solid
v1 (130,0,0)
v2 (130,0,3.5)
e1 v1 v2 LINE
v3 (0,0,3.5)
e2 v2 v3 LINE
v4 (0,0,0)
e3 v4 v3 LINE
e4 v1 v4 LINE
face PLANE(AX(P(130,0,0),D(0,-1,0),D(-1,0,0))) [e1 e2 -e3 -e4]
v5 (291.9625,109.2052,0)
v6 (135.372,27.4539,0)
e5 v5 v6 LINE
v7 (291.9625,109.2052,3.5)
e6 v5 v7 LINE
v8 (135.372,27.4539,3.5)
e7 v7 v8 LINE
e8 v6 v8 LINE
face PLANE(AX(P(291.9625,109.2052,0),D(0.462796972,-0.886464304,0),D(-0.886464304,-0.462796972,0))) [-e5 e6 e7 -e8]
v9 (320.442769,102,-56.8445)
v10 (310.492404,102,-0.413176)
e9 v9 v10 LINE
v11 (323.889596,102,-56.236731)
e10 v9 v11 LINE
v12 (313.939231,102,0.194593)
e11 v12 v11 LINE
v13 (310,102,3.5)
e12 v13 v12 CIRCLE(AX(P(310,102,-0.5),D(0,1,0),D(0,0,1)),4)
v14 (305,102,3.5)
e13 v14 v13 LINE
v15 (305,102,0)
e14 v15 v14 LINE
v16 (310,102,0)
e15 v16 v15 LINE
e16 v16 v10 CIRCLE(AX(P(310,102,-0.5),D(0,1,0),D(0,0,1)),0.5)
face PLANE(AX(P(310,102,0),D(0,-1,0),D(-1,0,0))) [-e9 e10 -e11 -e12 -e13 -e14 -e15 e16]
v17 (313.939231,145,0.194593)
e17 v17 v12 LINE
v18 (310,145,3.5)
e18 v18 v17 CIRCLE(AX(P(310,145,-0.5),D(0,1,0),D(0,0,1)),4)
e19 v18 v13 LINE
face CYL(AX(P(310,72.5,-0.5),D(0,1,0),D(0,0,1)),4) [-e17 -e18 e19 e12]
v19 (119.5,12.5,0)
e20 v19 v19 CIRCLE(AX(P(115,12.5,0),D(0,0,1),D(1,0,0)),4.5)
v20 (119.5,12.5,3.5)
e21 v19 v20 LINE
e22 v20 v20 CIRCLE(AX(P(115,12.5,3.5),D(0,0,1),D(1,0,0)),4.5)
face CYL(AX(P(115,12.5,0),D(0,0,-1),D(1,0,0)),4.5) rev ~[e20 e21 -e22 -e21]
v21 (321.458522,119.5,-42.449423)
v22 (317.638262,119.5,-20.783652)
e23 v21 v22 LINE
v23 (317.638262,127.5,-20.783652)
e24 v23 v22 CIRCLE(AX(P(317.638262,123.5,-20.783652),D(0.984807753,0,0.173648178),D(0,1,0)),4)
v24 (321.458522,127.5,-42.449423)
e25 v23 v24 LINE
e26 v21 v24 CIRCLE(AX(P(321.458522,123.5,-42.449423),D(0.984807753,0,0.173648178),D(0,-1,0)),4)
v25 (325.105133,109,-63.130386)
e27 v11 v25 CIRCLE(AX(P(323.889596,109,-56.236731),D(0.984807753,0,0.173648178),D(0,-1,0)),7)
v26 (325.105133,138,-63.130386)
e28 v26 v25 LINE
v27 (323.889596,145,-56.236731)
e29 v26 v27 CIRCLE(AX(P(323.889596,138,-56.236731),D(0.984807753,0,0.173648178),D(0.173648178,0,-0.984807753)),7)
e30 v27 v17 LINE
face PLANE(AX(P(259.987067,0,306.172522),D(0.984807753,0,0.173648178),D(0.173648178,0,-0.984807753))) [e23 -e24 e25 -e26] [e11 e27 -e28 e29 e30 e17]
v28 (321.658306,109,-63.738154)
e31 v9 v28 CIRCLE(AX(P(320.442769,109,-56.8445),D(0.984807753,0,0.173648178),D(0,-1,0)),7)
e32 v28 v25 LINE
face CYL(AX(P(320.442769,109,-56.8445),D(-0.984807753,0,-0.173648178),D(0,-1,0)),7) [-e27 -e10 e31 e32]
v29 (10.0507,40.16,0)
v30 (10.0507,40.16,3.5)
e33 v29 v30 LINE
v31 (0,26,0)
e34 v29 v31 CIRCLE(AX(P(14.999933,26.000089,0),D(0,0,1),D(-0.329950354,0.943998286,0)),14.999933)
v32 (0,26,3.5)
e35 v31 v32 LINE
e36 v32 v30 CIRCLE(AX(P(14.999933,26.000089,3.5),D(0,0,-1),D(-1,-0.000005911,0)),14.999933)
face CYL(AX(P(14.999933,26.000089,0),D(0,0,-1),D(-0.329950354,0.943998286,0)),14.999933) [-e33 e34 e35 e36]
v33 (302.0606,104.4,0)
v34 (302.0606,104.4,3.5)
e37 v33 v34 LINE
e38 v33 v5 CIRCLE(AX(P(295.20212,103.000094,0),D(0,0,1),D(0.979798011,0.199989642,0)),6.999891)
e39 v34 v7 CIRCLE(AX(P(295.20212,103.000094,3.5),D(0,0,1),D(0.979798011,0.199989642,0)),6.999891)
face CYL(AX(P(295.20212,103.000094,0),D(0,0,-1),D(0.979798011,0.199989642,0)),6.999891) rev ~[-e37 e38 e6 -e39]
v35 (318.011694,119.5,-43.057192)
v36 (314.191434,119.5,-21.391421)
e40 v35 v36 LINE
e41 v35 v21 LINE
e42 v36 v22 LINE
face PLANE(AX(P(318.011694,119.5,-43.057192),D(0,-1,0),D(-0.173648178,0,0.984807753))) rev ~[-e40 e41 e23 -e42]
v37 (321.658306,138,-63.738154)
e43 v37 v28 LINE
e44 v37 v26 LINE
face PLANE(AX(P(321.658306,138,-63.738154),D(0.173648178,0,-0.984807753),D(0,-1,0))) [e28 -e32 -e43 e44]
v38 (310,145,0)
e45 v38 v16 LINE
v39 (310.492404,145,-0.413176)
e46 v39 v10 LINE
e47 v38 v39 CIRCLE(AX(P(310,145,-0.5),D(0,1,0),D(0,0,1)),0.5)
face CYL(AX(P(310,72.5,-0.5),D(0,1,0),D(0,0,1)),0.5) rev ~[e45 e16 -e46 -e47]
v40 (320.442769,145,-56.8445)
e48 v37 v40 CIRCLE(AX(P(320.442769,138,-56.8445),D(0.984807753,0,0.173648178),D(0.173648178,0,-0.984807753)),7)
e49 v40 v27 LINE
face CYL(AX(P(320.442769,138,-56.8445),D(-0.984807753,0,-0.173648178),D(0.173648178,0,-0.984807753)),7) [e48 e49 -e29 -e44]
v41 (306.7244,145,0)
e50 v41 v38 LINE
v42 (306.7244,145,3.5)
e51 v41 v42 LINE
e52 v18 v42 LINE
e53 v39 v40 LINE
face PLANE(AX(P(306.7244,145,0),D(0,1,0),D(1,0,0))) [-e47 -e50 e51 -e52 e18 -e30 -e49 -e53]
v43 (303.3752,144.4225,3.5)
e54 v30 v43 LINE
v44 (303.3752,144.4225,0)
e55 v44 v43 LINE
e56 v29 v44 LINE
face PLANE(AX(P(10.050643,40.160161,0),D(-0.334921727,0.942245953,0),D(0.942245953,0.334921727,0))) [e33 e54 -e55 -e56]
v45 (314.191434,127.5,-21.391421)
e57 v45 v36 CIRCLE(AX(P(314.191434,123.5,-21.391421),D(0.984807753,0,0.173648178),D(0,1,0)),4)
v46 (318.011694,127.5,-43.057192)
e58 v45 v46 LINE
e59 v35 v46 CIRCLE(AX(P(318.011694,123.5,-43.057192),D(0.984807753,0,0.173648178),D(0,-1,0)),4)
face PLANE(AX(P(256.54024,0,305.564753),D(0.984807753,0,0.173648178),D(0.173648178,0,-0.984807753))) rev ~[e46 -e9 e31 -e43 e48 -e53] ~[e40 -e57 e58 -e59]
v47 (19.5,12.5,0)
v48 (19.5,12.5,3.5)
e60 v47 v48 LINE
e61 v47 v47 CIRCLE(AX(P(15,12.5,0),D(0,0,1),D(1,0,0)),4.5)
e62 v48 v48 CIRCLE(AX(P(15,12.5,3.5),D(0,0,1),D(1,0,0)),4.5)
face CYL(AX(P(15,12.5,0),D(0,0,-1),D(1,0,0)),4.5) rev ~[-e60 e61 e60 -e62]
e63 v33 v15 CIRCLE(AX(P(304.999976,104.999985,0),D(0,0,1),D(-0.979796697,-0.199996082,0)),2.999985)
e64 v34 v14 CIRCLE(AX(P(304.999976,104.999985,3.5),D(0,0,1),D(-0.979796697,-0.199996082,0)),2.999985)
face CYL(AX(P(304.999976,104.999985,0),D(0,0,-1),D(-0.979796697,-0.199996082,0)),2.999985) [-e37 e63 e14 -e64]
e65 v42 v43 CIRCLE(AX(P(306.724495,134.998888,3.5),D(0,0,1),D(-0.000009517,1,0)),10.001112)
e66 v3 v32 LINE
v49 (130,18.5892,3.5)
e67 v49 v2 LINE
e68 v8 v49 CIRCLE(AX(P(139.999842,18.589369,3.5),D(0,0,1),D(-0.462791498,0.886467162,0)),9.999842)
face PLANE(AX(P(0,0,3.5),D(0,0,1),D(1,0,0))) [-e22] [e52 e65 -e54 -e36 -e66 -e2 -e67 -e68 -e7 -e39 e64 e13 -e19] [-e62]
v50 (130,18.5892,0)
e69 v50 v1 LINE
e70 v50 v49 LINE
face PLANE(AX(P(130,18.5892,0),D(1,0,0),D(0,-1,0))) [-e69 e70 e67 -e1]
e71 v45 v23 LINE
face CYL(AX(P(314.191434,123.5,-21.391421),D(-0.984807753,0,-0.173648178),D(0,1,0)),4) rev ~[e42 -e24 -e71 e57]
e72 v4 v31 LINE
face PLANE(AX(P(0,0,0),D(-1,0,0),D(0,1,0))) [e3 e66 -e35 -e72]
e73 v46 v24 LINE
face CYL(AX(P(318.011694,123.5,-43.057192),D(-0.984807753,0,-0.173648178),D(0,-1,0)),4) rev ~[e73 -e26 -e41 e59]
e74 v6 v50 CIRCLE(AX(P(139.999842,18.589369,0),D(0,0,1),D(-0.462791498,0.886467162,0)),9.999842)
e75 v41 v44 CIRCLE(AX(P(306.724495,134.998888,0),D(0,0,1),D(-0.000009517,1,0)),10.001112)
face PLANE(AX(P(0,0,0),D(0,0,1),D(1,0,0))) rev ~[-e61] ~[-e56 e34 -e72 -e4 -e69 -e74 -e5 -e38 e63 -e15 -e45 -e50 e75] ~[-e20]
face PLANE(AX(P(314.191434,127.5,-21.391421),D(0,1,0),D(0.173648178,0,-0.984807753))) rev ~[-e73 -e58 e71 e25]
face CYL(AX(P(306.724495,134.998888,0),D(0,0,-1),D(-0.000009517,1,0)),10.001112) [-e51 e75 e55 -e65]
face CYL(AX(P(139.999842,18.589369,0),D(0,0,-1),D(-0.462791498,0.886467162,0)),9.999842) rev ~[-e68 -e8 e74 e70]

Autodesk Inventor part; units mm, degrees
ref_plane "YZ Plane" through (0, 0, 0) normal (1, 0, 0) x (0, 1, 0)
ref_plane "XZ Plane" through (0, 0, 0) normal (0, 1, 0) x (-1, 0, 0)
ref_plane "XY Plane" through (0, 0, 0) normal (0, 0, 1) x (1, 0, 0)
sketch "草圖1" plane through (0, 0, 0) normal (0, 0, 1) x (1, 0, 0)
  line L0 (0, 0) -> (-7.8042, 0) construction
  line L1 (0, 0) -> (0, -16.694) construction
  line L2 (0, 0) -> (0, 26)
  line L3 (310, 145) -> (310, 102)
  line L4 (130, 18.5892) -> (130, 0)
  line L5 (130, 0) -> (0, 0)
  line L6 (310, 145) -> (368, 145)
  line L7 (375, 138) -> (375, 109)
  line L8 (368, 102) -> (310, 102)
  line L9 (332, 127.5) -> (354, 127.5)
  arc A0 (354, 119.5) -> (354, 127.5) centre (354, 123.5) ccw
  line L10 (354, 119.5) -> (332, 119.5)
  arc A1 (332, 127.5) -> (332, 119.5) centre (332, 123.5) ccw
  circle A2 centre (15, 12.5) radius 4.5
  circle A3 centre (115, 12.5) radius 4.5
  line L11 (15, 12.5) -> (115, 12.5) construction
  arc A4 (10.0507, 40.16) -> (0, 26) centre (15, 26) ccw
  line L12 (9.9762, 40.1337) -> (303.3752, 144.4225)
  line L13 (306.7244, 145) -> (310, 145)
  line L14 (310, 102) -> (305, 102)
  line L15 (291.9625, 109.2052) -> (135.372, 27.4539)
  arc A5 (375, 138) -> (368, 145) centre (368, 138) ccw
  arc A6 (368, 102) -> (375, 109) centre (368, 109) ccw
  arc A7 (302.0606, 104.4) -> (305, 102) centre (305, 105) ccw
  arc A8 (302.0606, 104.4) -> (291.9625, 109.2052) centre (295.202, 103) ccw
  arc A9 (306.7244, 145) -> (303.3752, 144.4225) centre (306.7244, 135) ccw
  arc A10 (135.372, 27.4539) -> (130, 18.5892) centre (140, 18.5892) ccw
  point P0 (130, 34.6822)
  point P1 (375, 145)
  point P2 (375, 102)
  point P3 (65, 12.5)
  point P4 (65, 0)
  point P5 (130, 24.6493)
  point P6 (305, 145)
  point P7 (305, 102)
  point P8 (305, 116.0118)
  dimension "d0" = 130
  dimension "d1" = 145
  dimension "d2" = 43
  dimension "d3" = 65
  dimension "d4" = 8
  dimension "d5" = 30
  dimension "d7" = 18
  dimension "d8" = 310
  dimension "d14" = 12.5
  dimension "d15" = 100
  dimension "d16" = 9
  dimension "d17" = 21.5
  dimension "d20" = 15
  dimension "d21" = 26
  dimension "d23" = 5
  dimension "d24" = 7
  dimension "d26" = 3
  dimension "d28" = 35
  dimension "d29" = 7
  dimension "d30" = 5
  dimension "d31" = 10
  dimension "d32" = 10
  dimension "d33" = 8
extrude "擠出1" add sketch "草圖1" along normal blind 3.5
bend part "折彎零件1" radius 0.5 angle 80 line through (310, 145, 0) along (0, -1, 0) centre toward (0, 0, -1) moving side (1, 0, 0) both sides no
properties part number "0 零件"
